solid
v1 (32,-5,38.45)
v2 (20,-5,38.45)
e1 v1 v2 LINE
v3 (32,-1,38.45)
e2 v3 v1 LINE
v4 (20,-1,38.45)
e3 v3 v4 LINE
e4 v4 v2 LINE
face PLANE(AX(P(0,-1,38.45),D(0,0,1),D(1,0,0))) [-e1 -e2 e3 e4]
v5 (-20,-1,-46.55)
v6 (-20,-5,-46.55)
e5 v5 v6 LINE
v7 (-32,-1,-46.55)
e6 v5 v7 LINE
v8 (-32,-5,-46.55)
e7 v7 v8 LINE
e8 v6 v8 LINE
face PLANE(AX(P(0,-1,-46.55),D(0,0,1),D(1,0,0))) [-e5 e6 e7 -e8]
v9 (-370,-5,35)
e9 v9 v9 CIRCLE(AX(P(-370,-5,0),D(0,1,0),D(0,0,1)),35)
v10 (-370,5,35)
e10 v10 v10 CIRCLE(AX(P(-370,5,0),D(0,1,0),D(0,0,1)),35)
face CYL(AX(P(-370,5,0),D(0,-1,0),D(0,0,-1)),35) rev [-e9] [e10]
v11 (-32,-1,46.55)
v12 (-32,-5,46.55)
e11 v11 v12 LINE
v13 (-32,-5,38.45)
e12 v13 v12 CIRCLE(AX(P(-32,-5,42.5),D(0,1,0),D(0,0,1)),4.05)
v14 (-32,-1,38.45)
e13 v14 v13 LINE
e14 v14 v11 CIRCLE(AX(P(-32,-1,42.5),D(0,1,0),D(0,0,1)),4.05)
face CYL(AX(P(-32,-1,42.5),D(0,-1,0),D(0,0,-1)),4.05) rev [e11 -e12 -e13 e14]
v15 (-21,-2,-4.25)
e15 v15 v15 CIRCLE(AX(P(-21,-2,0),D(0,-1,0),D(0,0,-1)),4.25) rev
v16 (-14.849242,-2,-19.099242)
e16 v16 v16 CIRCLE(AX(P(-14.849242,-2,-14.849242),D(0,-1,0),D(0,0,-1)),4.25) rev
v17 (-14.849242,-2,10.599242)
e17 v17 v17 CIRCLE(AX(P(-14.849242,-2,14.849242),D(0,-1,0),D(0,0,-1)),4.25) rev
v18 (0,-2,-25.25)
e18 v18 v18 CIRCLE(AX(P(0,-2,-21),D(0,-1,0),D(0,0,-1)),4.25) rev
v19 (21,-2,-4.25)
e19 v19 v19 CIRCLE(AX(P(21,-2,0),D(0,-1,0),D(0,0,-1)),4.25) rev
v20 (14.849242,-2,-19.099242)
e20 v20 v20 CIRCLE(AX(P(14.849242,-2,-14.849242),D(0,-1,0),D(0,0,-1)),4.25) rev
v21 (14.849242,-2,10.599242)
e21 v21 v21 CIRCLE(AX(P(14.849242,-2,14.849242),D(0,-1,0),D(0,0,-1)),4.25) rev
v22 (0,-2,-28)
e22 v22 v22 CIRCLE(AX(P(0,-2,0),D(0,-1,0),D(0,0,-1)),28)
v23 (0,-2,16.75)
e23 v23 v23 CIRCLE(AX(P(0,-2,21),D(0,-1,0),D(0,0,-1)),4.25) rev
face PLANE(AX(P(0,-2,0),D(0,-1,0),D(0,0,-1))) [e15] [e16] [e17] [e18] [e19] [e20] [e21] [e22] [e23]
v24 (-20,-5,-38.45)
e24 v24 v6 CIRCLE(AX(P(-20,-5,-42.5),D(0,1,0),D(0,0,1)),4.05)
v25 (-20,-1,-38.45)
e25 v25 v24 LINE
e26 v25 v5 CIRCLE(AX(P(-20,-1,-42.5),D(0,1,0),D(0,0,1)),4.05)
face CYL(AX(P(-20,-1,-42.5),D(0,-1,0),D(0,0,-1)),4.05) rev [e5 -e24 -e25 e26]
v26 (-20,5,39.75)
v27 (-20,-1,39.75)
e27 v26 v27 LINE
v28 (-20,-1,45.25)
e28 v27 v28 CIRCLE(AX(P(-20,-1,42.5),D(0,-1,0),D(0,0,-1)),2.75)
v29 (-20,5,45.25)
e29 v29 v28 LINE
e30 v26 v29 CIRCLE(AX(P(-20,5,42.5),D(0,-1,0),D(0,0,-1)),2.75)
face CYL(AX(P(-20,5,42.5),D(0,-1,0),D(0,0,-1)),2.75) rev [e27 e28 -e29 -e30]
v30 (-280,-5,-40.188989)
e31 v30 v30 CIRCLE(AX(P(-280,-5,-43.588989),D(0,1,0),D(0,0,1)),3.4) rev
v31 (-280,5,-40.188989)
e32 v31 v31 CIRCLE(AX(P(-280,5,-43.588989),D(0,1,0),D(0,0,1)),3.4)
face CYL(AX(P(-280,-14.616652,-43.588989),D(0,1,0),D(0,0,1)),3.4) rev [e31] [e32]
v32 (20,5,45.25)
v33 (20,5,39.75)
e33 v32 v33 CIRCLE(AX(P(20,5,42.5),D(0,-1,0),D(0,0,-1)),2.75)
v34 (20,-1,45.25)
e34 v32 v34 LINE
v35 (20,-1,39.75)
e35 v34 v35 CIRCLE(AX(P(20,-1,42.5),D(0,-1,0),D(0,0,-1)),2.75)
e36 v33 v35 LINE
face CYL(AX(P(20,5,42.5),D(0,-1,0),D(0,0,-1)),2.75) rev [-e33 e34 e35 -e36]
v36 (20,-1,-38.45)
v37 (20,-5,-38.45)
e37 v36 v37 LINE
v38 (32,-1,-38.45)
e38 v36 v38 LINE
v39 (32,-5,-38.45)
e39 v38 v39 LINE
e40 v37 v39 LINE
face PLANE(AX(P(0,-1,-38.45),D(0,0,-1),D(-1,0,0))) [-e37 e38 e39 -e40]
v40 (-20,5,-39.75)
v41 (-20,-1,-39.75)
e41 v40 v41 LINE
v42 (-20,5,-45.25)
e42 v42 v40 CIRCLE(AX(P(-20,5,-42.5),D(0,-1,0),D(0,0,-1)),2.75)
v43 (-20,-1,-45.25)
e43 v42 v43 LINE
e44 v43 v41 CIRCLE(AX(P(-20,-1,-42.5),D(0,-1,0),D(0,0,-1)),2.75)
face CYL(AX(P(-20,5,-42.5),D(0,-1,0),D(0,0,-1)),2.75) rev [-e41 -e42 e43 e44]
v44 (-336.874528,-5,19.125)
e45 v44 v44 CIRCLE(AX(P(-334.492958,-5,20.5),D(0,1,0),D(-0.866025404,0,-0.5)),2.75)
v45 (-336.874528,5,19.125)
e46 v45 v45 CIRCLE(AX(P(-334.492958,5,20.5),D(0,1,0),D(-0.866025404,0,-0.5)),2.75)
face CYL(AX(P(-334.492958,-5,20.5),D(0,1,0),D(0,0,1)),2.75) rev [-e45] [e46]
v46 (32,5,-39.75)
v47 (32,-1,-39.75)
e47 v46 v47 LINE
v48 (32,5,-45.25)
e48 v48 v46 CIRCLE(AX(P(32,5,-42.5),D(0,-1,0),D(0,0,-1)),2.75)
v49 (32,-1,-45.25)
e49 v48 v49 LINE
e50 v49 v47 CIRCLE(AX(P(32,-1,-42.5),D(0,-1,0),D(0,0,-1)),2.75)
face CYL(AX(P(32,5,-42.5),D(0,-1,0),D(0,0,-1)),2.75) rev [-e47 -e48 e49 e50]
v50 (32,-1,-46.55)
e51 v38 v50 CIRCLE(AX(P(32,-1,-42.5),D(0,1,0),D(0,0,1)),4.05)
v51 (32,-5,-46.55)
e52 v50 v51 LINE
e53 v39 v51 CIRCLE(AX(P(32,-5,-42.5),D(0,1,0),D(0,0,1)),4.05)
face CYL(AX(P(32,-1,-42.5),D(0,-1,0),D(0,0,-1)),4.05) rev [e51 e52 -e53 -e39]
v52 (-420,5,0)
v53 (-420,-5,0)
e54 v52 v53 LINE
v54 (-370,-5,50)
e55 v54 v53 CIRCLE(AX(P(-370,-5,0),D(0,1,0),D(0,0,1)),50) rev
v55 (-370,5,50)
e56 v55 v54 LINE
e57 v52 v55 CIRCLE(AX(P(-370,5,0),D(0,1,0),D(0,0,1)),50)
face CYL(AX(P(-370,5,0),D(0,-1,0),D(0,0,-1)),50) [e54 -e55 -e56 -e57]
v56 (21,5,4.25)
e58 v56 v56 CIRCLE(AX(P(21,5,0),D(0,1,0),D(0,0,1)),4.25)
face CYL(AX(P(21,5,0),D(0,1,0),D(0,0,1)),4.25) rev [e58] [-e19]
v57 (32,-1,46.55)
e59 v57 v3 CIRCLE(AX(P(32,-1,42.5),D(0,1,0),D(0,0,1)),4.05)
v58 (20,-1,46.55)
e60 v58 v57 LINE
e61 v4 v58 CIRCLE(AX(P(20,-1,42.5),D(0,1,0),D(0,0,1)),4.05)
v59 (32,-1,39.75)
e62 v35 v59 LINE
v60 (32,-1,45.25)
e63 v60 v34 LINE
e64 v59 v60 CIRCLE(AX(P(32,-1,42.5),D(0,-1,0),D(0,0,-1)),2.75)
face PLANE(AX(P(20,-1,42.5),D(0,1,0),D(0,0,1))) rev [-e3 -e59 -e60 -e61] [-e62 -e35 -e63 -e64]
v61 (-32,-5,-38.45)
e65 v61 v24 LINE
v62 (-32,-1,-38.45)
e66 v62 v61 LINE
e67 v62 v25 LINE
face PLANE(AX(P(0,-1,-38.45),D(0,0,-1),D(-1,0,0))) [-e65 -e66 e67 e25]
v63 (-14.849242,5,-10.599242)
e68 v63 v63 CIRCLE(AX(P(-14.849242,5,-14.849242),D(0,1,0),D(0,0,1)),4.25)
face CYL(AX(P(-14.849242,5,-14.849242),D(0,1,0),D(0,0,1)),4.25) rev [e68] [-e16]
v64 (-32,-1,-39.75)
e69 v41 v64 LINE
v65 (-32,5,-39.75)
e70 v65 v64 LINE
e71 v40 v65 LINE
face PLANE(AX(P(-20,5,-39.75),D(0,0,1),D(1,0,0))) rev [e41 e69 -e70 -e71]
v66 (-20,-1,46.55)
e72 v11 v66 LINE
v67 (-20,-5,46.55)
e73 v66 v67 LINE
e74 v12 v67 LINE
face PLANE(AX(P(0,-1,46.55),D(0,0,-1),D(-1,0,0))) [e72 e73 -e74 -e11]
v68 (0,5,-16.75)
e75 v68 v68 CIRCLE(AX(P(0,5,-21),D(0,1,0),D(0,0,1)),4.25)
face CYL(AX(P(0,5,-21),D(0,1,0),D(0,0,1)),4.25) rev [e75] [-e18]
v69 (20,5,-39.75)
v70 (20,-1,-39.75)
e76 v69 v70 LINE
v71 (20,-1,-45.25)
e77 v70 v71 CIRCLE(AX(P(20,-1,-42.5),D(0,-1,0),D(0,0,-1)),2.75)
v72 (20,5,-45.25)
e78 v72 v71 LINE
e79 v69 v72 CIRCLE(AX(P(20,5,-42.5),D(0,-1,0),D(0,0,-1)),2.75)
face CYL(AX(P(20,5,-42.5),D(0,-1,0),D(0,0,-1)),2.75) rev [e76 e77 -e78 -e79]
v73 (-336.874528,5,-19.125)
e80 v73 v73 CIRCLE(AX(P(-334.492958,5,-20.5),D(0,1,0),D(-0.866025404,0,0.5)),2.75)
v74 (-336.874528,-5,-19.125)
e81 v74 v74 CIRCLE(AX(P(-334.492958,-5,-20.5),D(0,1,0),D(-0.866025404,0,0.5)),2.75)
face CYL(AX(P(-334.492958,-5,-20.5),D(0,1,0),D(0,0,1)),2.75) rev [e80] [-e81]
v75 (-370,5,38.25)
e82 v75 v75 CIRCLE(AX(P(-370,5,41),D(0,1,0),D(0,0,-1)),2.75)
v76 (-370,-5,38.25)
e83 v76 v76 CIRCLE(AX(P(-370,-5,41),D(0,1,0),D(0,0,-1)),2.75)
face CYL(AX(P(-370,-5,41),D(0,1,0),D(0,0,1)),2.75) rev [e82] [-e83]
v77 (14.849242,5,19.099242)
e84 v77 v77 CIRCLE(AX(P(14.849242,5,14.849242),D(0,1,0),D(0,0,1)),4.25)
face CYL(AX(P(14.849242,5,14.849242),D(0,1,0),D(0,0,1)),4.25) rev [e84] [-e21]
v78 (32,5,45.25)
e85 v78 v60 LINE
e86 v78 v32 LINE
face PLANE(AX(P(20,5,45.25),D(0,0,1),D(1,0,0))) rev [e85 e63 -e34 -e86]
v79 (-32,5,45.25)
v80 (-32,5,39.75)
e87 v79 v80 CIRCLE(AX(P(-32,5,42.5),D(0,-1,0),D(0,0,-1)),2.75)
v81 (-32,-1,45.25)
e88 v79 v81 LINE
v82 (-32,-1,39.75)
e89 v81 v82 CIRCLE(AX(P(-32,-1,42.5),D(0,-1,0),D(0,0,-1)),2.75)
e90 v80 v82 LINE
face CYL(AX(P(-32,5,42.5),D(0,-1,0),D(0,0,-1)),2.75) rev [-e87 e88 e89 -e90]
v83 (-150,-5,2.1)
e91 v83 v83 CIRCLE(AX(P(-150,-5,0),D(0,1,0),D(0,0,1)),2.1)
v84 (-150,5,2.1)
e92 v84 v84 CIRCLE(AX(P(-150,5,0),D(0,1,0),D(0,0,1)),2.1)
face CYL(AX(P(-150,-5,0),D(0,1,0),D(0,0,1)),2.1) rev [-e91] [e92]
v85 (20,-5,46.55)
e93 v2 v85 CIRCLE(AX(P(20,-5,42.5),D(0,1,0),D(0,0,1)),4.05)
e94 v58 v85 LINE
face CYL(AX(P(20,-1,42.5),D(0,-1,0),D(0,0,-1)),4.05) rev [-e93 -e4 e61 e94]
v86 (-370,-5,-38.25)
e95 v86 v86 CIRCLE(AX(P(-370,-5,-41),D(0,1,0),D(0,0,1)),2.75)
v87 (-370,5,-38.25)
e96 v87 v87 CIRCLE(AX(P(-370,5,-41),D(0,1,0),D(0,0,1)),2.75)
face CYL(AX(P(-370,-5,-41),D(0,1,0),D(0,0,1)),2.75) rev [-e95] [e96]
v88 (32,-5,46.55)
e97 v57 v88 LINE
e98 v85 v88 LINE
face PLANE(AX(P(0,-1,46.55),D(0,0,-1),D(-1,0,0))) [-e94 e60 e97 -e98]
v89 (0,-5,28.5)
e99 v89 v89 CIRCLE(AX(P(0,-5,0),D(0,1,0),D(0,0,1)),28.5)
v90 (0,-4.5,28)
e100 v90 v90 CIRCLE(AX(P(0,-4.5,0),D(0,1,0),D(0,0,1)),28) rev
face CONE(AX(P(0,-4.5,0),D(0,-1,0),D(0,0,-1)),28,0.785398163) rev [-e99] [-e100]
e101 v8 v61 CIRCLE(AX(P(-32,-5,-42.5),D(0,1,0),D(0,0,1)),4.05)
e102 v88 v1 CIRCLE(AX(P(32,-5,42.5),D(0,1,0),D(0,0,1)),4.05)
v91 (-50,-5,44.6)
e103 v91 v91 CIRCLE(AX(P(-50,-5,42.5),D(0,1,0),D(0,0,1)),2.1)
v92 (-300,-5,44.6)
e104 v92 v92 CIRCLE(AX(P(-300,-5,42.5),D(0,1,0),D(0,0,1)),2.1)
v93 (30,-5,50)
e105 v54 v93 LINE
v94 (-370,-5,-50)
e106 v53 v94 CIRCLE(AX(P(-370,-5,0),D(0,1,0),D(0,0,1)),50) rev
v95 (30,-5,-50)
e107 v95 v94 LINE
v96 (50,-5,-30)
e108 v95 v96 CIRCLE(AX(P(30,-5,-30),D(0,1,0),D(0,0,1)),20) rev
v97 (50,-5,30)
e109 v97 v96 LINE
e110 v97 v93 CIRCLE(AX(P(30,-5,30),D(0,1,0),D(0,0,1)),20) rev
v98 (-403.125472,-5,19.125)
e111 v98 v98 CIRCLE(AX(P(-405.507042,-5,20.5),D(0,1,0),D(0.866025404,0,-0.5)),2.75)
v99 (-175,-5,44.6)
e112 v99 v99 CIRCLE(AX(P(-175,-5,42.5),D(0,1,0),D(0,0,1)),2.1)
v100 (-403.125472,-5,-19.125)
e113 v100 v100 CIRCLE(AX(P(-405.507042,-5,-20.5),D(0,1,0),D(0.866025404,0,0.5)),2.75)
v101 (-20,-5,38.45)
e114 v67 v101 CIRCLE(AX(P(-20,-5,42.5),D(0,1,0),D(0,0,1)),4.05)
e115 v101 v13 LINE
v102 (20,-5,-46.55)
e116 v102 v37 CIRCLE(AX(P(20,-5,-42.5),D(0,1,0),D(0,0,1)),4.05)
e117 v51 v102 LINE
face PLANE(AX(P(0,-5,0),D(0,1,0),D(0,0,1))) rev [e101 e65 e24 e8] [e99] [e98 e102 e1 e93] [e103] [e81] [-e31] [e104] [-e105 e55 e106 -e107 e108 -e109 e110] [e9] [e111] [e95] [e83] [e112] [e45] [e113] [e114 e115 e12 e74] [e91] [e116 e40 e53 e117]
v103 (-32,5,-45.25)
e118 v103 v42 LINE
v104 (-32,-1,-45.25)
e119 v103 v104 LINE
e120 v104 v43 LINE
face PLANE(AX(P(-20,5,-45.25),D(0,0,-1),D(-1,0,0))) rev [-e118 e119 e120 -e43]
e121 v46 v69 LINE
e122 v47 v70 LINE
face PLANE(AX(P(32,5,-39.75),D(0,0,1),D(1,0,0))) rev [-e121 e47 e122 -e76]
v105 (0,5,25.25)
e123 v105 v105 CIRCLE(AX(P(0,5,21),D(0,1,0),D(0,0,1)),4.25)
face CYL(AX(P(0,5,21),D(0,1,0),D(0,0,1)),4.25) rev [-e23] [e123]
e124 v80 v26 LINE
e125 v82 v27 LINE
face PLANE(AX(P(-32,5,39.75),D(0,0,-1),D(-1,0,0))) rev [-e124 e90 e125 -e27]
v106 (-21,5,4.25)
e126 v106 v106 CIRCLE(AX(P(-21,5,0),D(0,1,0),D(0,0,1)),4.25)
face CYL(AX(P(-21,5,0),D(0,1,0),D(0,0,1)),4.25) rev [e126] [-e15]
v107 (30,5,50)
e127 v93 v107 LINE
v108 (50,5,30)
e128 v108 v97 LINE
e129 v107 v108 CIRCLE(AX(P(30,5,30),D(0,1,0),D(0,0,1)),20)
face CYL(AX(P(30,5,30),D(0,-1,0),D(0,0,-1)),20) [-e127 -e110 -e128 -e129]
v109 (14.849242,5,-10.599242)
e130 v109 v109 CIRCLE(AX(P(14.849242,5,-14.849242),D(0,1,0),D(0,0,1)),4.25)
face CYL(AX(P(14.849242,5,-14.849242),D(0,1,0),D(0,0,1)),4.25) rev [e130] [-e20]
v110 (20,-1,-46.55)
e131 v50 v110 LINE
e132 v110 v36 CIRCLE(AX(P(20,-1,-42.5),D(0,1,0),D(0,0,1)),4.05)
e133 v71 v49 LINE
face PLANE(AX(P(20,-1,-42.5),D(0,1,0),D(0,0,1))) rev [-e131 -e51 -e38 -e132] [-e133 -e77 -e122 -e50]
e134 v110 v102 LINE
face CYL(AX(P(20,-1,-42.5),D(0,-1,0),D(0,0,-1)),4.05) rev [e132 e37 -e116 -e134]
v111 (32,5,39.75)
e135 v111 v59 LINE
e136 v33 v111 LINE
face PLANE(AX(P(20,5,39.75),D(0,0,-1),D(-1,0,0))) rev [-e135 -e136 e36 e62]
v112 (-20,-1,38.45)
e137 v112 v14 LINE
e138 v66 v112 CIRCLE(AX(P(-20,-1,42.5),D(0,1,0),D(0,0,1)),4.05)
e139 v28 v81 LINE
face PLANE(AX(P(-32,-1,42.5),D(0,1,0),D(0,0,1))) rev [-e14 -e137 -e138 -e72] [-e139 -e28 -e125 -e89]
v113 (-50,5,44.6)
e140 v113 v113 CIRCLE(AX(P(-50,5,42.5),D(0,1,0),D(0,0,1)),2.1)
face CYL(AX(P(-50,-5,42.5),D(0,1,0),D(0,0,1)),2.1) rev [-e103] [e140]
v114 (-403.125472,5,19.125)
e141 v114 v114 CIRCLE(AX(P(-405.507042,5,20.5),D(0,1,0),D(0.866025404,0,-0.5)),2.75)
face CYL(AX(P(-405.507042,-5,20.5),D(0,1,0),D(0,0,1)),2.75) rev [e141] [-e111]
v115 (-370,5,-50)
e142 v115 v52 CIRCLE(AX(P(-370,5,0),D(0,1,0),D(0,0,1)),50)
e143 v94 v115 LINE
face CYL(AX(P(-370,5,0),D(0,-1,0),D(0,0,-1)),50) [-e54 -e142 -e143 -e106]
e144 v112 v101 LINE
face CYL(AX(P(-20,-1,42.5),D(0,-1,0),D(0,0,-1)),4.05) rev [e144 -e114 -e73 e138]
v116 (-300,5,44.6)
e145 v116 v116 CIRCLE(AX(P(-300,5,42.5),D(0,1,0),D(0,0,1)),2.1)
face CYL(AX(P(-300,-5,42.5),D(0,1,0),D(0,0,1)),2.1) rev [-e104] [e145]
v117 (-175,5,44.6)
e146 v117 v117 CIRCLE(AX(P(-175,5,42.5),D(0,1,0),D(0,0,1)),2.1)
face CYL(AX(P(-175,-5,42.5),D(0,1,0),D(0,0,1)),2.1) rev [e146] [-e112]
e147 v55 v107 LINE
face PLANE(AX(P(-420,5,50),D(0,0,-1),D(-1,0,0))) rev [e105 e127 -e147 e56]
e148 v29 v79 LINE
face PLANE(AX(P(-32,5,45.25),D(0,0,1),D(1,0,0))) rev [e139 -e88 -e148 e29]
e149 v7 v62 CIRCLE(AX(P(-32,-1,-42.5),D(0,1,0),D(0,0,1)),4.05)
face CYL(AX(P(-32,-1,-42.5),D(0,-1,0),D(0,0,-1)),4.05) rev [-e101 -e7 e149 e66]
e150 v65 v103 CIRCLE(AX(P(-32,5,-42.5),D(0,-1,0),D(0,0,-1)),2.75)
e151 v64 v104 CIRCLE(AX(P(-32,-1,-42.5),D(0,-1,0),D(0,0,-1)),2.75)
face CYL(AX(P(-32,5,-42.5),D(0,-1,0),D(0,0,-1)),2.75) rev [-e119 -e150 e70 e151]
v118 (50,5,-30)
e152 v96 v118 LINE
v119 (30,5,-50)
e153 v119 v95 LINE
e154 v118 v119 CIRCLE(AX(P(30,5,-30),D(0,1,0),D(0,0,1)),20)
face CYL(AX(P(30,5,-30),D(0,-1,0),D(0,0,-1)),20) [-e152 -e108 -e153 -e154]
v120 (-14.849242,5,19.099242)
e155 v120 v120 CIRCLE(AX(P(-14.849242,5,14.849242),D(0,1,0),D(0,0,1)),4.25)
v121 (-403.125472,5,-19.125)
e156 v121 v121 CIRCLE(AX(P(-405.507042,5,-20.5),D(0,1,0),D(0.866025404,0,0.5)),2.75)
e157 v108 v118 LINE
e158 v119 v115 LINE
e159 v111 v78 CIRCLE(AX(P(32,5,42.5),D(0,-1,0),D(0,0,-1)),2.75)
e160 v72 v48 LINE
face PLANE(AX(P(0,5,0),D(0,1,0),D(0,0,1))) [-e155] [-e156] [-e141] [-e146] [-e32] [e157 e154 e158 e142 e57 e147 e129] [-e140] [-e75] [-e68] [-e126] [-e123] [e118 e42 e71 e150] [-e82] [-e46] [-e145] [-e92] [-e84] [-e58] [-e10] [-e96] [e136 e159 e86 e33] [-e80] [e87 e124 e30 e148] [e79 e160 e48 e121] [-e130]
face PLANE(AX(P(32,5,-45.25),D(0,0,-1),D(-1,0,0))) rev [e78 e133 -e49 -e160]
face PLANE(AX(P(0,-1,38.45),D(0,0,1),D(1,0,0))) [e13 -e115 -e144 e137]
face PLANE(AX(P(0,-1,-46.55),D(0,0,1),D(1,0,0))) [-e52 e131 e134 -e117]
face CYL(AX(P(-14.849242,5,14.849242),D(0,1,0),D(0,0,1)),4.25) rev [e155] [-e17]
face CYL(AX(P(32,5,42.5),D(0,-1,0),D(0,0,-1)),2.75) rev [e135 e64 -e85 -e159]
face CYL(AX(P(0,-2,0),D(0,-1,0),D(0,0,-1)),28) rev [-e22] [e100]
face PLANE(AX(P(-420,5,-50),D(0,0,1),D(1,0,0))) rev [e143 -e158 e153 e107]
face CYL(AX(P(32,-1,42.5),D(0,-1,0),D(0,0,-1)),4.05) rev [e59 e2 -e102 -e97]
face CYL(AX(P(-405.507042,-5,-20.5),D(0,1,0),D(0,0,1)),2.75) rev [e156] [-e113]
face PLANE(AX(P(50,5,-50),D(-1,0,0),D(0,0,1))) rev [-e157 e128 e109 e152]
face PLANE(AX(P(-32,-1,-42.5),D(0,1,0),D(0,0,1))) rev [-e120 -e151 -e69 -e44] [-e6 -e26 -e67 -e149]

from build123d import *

# Parameters (mm, degrees)
SCHIZZO1_W                   = 470
SCHIZZO1_H                   = 100
SCHIZZO1_R                   = 35
ESTRUSIONE_ESTRUSIONE1_DEPTH = 5
FORO_PER_VITE_M8_1_D         = 8.5
RIPETIZIONECIRCOLARE1_COUNT  = 8
SCHIZZO6_R                   = 28
TAGLIO_ESTRUSIONE1_DEPTH     = 3
SMUSSO1_SIZE                 = 0.5
SCHIZZO7_R                   = 2.75
TAGLIO_ESTRUSIONE2_DEPTH     = 424.083916026
RIPETIZIONECIRCOLARE2_COUNT  = 6
RACCORDO1_R                  = 20
RACCORDO2_R                  = 50
TAGLIO_ESTRUSIONE3_START     = -10
TAGLIO_ESTRUSIONE3_DEPTH     = 4
SCHIZZO10_R                  = 2.1
TAGLIO_ESTRUSIONE4_DEPTH     = 424.083916026
SCHIZZO11_R                  = 3.4
TAGLIO_ESTRUSIONE5_DEPTH     = 10
SCHIZZO12_R                  = 2.1
TAGLIO_ESTRUSIONE6_DEPTH     = 424.083916026
TAGLIO_ESTRUSIONE7_DEPTH     = 424.008274151


with BuildPart() as part:
    # Schizzo1 → Estrusione-Estrusione1 (new, symmetric)
    with BuildSketch(Plane(origin=(0, 0, 0), x_dir=(1, 0, 0), z_dir=(0, 1, 0))):
        with Locations((-185, 0)):
            Rectangle(SCHIZZO1_W, SCHIZZO1_H)
        with Locations(Location((-370, 0, 0), (0, 0, 270))):
            Circle(SCHIZZO1_R, mode=Mode.SUBTRACT)
    extrude(amount=ESTRUSIONE_ESTRUSIONE1_DEPTH, both=True)

    # Foro per Vite M8-1 (through all)
    with Locations(Plane(origin=(0, 5, 0), x_dir=(1, 0, 0), z_dir=(0, 1, 0))):
        with Locations((21, 0)):
            foro_per_vite_m8_1 = Hole(FORO_PER_VITE_M8_1_D / 2)

    # RipetizioneCircolare1: Foro per Vite M8-1 ×8 about axis
    ripetizionecircolare1_axis = Axis((0, 0, 0), (0, 1, 0))
    for i in range(1, RIPETIZIONECIRCOLARE1_COUNT):
        add(foro_per_vite_m8_1.rotate(ripetizionecircolare1_axis, i * 360 / RIPETIZIONECIRCOLARE1_COUNT), mode=Mode.SUBTRACT)

    # Schizzo6 → Taglio-Estrusione1 (cut)
    with BuildSketch(Plane.XZ.offset(5)):
        with Locations(Location((0, 0, 0), (0, 0, 270))):
            Circle(SCHIZZO6_R)
    extrude(amount=-TAGLIO_ESTRUSIONE1_DEPTH, mode=Mode.SUBTRACT)

    # Smusso1
    smusso1_edges = [part.edges().sort_by_distance(p)[0] for p in [
        (0, -5, 28),
    ]]
    chamfer(smusso1_edges, length=SMUSSO1_SIZE)

    # Schizzo7 → Taglio-Estrusione2 (cut, through all)
    with BuildSketch(Plane(origin=(0, 5, 0), x_dir=(1, 0, 0), z_dir=(0, 1, 0))):
        with Locations(Location((-370, 41, 0), (0, 0, 270))):
            Circle(SCHIZZO7_R)
    taglio_estrusione2 = extrude(amount=-TAGLIO_ESTRUSIONE2_DEPTH, mode=Mode.SUBTRACT)

    # RipetizioneCircolare2: Taglio-Estrusione2 ×6 about axis
    ripetizionecircolare2_axis = Axis((-370, 0, 0), (0, 1, 0))
    for i in range(1, RIPETIZIONECIRCOLARE2_COUNT):
        add(taglio_estrusione2.rotate(ripetizionecircolare2_axis, i * 360 / RIPETIZIONECIRCOLARE2_COUNT), mode=Mode.SUBTRACT)

    # Raccordo1
    raccordo1_edges = [part.edges().sort_by_distance(p)[0] for p in [
        (50, 0, -50),
        (50, 0, 50),
    ]]
    fillet(raccordo1_edges, radius=RACCORDO1_R)

    # Raccordo2
    raccordo2_edges = [part.edges().sort_by_distance(p)[0] for p in [
        (-420, 0, -50),
        (-420, 0, 50),
    ]]
    fillet(raccordo2_edges, radius=RACCORDO2_R - 0.0001)  # a hair under: the kernel refuses the full size

    # Schizzo9 → Taglio-Estrusione3 (cut)
    with BuildSketch(Plane(origin=(0, 5, 0), x_dir=(1, 0, 0), z_dir=(0, 1, 0)).offset(TAGLIO_ESTRUSIONE3_START)):
        with BuildLine():
            Line((-32, 46.55), (-20, 46.55))
            ThreePointArc((-20, 46.55), (-15.95, 42.5), (-20, 38.45))
            Line((-20, 38.45), (-32, 38.45))
            ThreePointArc((-32, 38.45), (-36.05, 42.5), (-32, 46.55))
        make_face()
        with BuildLine():
            Line((20, 46.55), (32, 46.55))
            ThreePointArc((32, 46.55), (36.05, 42.5), (32, 38.45))
            Line((32, 38.45), (20, 38.45))
            ThreePointArc((20, 38.45), (15.95, 42.5), (20, 46.55))
        make_face()
        with BuildLine():
            Line((-32, -38.45), (-20, -38.45))
            ThreePointArc((-20, -38.45), (-15.95, -42.5), (-20, -46.55))
            Line((-20, -46.55), (-32, -46.55))
            ThreePointArc((-32, -46.55), (-36.05, -42.5), (-32, -38.45))
        make_face()
        with BuildLine():
            Line((20, -38.45), (32, -38.45))
            ThreePointArc((32, -38.45), (36.05, -42.5), (32, -46.55))
            Line((32, -46.55), (20, -46.55))
            ThreePointArc((20, -46.55), (15.95, -42.5), (20, -38.45))
        make_face()
    extrude(amount=TAGLIO_ESTRUSIONE3_DEPTH, mode=Mode.SUBTRACT)

    # Schizzo10 → Taglio-Estrusione4 (cut, through all)
    with BuildSketch(Plane(origin=(0, 5, 0), x_dir=(1, 0, 0), z_dir=(0, 1, 0))):
        with Locations(Location((-150, 0, 0), (0, 0, 270))):
            Circle(SCHIZZO10_R)
    extrude(amount=-TAGLIO_ESTRUSIONE4_DEPTH, mode=Mode.SUBTRACT)

    # Schizzo11 → Taglio-Estrusione5 (cut)
    with BuildSketch(Plane(origin=(0, 5, 0), x_dir=(1, 0, 0), z_dir=(0, 1, 0))):
        with Locations(Location((-280, 43.588989435, 0), (0, 0, 270))):
            Circle(SCHIZZO11_R)
    extrude(amount=-TAGLIO_ESTRUSIONE5_DEPTH, mode=Mode.SUBTRACT)

    # Schizzo12 → Taglio-Estrusione6 (cut, through all)
    with BuildSketch(Plane(origin=(0, 5, 0), x_dir=(1, 0, 0), z_dir=(0, 1, 0))):
        with Locations(Location((-50, -42.5, 0), (0, 0, 270))):
            Circle(SCHIZZO12_R)
        with Locations(Location((-300, -42.5, 0), (0, 0, 270))):
            Circle(SCHIZZO12_R)
        with Locations(Location((-175, -42.5, 0), (0, 0, 270))):
            Circle(SCHIZZO12_R)
    extrude(amount=-TAGLIO_ESTRUSIONE6_DEPTH, mode=Mode.SUBTRACT)

    # Schizzo13 → Taglio-Estrusione7 (cut, through all)
    with BuildSketch(Plane(origin=(0, -1, 0), x_dir=(-1, 0, 0), z_dir=(0, -1, 0))):
        with BuildLine():
            Line((32, -45.25), (20, -45.25))
            ThreePointArc((20, -45.25), (17.25, -42.5), (20, -39.75))
            Line((20, -39.75), (32, -39.75))
            ThreePointArc((32, -39.75), (34.75, -42.5), (32, -45.25))
        make_face()
        with BuildLine():
            Line((-20, -45.25), (-32, -45.25))
            ThreePointArc((-32, -45.25), (-34.75, -42.5), (-32, -39.75))
            Line((-32, -39.75), (-20, -39.75))
            ThreePointArc((-20, -39.75), (-17.25, -42.5), (-20, -45.25))
        make_face()
        with BuildLine():
            Line((-32, 45.25), (-20, 45.25))
            ThreePointArc((-20, 45.25), (-17.25, 42.5), (-20, 39.75))
            Line((-20, 39.75), (-32, 39.75))
            ThreePointArc((-32, 39.75), (-34.75, 42.5), (-32, 45.25))
        make_face()
        with BuildLine():
            Line((20, 45.25), (32, 45.25))
            ThreePointArc((32, 45.25), (34.75, 42.5), (32, 39.75))
            Line((32, 39.75), (20, 39.75))
            ThreePointArc((20, 39.75), (17.25, 42.5), (20, 45.25))
        make_face()
    extrude(amount=-TAGLIO_ESTRUSIONE7_DEPTH, mode=Mode.SUBTRACT)


solid = part.part
